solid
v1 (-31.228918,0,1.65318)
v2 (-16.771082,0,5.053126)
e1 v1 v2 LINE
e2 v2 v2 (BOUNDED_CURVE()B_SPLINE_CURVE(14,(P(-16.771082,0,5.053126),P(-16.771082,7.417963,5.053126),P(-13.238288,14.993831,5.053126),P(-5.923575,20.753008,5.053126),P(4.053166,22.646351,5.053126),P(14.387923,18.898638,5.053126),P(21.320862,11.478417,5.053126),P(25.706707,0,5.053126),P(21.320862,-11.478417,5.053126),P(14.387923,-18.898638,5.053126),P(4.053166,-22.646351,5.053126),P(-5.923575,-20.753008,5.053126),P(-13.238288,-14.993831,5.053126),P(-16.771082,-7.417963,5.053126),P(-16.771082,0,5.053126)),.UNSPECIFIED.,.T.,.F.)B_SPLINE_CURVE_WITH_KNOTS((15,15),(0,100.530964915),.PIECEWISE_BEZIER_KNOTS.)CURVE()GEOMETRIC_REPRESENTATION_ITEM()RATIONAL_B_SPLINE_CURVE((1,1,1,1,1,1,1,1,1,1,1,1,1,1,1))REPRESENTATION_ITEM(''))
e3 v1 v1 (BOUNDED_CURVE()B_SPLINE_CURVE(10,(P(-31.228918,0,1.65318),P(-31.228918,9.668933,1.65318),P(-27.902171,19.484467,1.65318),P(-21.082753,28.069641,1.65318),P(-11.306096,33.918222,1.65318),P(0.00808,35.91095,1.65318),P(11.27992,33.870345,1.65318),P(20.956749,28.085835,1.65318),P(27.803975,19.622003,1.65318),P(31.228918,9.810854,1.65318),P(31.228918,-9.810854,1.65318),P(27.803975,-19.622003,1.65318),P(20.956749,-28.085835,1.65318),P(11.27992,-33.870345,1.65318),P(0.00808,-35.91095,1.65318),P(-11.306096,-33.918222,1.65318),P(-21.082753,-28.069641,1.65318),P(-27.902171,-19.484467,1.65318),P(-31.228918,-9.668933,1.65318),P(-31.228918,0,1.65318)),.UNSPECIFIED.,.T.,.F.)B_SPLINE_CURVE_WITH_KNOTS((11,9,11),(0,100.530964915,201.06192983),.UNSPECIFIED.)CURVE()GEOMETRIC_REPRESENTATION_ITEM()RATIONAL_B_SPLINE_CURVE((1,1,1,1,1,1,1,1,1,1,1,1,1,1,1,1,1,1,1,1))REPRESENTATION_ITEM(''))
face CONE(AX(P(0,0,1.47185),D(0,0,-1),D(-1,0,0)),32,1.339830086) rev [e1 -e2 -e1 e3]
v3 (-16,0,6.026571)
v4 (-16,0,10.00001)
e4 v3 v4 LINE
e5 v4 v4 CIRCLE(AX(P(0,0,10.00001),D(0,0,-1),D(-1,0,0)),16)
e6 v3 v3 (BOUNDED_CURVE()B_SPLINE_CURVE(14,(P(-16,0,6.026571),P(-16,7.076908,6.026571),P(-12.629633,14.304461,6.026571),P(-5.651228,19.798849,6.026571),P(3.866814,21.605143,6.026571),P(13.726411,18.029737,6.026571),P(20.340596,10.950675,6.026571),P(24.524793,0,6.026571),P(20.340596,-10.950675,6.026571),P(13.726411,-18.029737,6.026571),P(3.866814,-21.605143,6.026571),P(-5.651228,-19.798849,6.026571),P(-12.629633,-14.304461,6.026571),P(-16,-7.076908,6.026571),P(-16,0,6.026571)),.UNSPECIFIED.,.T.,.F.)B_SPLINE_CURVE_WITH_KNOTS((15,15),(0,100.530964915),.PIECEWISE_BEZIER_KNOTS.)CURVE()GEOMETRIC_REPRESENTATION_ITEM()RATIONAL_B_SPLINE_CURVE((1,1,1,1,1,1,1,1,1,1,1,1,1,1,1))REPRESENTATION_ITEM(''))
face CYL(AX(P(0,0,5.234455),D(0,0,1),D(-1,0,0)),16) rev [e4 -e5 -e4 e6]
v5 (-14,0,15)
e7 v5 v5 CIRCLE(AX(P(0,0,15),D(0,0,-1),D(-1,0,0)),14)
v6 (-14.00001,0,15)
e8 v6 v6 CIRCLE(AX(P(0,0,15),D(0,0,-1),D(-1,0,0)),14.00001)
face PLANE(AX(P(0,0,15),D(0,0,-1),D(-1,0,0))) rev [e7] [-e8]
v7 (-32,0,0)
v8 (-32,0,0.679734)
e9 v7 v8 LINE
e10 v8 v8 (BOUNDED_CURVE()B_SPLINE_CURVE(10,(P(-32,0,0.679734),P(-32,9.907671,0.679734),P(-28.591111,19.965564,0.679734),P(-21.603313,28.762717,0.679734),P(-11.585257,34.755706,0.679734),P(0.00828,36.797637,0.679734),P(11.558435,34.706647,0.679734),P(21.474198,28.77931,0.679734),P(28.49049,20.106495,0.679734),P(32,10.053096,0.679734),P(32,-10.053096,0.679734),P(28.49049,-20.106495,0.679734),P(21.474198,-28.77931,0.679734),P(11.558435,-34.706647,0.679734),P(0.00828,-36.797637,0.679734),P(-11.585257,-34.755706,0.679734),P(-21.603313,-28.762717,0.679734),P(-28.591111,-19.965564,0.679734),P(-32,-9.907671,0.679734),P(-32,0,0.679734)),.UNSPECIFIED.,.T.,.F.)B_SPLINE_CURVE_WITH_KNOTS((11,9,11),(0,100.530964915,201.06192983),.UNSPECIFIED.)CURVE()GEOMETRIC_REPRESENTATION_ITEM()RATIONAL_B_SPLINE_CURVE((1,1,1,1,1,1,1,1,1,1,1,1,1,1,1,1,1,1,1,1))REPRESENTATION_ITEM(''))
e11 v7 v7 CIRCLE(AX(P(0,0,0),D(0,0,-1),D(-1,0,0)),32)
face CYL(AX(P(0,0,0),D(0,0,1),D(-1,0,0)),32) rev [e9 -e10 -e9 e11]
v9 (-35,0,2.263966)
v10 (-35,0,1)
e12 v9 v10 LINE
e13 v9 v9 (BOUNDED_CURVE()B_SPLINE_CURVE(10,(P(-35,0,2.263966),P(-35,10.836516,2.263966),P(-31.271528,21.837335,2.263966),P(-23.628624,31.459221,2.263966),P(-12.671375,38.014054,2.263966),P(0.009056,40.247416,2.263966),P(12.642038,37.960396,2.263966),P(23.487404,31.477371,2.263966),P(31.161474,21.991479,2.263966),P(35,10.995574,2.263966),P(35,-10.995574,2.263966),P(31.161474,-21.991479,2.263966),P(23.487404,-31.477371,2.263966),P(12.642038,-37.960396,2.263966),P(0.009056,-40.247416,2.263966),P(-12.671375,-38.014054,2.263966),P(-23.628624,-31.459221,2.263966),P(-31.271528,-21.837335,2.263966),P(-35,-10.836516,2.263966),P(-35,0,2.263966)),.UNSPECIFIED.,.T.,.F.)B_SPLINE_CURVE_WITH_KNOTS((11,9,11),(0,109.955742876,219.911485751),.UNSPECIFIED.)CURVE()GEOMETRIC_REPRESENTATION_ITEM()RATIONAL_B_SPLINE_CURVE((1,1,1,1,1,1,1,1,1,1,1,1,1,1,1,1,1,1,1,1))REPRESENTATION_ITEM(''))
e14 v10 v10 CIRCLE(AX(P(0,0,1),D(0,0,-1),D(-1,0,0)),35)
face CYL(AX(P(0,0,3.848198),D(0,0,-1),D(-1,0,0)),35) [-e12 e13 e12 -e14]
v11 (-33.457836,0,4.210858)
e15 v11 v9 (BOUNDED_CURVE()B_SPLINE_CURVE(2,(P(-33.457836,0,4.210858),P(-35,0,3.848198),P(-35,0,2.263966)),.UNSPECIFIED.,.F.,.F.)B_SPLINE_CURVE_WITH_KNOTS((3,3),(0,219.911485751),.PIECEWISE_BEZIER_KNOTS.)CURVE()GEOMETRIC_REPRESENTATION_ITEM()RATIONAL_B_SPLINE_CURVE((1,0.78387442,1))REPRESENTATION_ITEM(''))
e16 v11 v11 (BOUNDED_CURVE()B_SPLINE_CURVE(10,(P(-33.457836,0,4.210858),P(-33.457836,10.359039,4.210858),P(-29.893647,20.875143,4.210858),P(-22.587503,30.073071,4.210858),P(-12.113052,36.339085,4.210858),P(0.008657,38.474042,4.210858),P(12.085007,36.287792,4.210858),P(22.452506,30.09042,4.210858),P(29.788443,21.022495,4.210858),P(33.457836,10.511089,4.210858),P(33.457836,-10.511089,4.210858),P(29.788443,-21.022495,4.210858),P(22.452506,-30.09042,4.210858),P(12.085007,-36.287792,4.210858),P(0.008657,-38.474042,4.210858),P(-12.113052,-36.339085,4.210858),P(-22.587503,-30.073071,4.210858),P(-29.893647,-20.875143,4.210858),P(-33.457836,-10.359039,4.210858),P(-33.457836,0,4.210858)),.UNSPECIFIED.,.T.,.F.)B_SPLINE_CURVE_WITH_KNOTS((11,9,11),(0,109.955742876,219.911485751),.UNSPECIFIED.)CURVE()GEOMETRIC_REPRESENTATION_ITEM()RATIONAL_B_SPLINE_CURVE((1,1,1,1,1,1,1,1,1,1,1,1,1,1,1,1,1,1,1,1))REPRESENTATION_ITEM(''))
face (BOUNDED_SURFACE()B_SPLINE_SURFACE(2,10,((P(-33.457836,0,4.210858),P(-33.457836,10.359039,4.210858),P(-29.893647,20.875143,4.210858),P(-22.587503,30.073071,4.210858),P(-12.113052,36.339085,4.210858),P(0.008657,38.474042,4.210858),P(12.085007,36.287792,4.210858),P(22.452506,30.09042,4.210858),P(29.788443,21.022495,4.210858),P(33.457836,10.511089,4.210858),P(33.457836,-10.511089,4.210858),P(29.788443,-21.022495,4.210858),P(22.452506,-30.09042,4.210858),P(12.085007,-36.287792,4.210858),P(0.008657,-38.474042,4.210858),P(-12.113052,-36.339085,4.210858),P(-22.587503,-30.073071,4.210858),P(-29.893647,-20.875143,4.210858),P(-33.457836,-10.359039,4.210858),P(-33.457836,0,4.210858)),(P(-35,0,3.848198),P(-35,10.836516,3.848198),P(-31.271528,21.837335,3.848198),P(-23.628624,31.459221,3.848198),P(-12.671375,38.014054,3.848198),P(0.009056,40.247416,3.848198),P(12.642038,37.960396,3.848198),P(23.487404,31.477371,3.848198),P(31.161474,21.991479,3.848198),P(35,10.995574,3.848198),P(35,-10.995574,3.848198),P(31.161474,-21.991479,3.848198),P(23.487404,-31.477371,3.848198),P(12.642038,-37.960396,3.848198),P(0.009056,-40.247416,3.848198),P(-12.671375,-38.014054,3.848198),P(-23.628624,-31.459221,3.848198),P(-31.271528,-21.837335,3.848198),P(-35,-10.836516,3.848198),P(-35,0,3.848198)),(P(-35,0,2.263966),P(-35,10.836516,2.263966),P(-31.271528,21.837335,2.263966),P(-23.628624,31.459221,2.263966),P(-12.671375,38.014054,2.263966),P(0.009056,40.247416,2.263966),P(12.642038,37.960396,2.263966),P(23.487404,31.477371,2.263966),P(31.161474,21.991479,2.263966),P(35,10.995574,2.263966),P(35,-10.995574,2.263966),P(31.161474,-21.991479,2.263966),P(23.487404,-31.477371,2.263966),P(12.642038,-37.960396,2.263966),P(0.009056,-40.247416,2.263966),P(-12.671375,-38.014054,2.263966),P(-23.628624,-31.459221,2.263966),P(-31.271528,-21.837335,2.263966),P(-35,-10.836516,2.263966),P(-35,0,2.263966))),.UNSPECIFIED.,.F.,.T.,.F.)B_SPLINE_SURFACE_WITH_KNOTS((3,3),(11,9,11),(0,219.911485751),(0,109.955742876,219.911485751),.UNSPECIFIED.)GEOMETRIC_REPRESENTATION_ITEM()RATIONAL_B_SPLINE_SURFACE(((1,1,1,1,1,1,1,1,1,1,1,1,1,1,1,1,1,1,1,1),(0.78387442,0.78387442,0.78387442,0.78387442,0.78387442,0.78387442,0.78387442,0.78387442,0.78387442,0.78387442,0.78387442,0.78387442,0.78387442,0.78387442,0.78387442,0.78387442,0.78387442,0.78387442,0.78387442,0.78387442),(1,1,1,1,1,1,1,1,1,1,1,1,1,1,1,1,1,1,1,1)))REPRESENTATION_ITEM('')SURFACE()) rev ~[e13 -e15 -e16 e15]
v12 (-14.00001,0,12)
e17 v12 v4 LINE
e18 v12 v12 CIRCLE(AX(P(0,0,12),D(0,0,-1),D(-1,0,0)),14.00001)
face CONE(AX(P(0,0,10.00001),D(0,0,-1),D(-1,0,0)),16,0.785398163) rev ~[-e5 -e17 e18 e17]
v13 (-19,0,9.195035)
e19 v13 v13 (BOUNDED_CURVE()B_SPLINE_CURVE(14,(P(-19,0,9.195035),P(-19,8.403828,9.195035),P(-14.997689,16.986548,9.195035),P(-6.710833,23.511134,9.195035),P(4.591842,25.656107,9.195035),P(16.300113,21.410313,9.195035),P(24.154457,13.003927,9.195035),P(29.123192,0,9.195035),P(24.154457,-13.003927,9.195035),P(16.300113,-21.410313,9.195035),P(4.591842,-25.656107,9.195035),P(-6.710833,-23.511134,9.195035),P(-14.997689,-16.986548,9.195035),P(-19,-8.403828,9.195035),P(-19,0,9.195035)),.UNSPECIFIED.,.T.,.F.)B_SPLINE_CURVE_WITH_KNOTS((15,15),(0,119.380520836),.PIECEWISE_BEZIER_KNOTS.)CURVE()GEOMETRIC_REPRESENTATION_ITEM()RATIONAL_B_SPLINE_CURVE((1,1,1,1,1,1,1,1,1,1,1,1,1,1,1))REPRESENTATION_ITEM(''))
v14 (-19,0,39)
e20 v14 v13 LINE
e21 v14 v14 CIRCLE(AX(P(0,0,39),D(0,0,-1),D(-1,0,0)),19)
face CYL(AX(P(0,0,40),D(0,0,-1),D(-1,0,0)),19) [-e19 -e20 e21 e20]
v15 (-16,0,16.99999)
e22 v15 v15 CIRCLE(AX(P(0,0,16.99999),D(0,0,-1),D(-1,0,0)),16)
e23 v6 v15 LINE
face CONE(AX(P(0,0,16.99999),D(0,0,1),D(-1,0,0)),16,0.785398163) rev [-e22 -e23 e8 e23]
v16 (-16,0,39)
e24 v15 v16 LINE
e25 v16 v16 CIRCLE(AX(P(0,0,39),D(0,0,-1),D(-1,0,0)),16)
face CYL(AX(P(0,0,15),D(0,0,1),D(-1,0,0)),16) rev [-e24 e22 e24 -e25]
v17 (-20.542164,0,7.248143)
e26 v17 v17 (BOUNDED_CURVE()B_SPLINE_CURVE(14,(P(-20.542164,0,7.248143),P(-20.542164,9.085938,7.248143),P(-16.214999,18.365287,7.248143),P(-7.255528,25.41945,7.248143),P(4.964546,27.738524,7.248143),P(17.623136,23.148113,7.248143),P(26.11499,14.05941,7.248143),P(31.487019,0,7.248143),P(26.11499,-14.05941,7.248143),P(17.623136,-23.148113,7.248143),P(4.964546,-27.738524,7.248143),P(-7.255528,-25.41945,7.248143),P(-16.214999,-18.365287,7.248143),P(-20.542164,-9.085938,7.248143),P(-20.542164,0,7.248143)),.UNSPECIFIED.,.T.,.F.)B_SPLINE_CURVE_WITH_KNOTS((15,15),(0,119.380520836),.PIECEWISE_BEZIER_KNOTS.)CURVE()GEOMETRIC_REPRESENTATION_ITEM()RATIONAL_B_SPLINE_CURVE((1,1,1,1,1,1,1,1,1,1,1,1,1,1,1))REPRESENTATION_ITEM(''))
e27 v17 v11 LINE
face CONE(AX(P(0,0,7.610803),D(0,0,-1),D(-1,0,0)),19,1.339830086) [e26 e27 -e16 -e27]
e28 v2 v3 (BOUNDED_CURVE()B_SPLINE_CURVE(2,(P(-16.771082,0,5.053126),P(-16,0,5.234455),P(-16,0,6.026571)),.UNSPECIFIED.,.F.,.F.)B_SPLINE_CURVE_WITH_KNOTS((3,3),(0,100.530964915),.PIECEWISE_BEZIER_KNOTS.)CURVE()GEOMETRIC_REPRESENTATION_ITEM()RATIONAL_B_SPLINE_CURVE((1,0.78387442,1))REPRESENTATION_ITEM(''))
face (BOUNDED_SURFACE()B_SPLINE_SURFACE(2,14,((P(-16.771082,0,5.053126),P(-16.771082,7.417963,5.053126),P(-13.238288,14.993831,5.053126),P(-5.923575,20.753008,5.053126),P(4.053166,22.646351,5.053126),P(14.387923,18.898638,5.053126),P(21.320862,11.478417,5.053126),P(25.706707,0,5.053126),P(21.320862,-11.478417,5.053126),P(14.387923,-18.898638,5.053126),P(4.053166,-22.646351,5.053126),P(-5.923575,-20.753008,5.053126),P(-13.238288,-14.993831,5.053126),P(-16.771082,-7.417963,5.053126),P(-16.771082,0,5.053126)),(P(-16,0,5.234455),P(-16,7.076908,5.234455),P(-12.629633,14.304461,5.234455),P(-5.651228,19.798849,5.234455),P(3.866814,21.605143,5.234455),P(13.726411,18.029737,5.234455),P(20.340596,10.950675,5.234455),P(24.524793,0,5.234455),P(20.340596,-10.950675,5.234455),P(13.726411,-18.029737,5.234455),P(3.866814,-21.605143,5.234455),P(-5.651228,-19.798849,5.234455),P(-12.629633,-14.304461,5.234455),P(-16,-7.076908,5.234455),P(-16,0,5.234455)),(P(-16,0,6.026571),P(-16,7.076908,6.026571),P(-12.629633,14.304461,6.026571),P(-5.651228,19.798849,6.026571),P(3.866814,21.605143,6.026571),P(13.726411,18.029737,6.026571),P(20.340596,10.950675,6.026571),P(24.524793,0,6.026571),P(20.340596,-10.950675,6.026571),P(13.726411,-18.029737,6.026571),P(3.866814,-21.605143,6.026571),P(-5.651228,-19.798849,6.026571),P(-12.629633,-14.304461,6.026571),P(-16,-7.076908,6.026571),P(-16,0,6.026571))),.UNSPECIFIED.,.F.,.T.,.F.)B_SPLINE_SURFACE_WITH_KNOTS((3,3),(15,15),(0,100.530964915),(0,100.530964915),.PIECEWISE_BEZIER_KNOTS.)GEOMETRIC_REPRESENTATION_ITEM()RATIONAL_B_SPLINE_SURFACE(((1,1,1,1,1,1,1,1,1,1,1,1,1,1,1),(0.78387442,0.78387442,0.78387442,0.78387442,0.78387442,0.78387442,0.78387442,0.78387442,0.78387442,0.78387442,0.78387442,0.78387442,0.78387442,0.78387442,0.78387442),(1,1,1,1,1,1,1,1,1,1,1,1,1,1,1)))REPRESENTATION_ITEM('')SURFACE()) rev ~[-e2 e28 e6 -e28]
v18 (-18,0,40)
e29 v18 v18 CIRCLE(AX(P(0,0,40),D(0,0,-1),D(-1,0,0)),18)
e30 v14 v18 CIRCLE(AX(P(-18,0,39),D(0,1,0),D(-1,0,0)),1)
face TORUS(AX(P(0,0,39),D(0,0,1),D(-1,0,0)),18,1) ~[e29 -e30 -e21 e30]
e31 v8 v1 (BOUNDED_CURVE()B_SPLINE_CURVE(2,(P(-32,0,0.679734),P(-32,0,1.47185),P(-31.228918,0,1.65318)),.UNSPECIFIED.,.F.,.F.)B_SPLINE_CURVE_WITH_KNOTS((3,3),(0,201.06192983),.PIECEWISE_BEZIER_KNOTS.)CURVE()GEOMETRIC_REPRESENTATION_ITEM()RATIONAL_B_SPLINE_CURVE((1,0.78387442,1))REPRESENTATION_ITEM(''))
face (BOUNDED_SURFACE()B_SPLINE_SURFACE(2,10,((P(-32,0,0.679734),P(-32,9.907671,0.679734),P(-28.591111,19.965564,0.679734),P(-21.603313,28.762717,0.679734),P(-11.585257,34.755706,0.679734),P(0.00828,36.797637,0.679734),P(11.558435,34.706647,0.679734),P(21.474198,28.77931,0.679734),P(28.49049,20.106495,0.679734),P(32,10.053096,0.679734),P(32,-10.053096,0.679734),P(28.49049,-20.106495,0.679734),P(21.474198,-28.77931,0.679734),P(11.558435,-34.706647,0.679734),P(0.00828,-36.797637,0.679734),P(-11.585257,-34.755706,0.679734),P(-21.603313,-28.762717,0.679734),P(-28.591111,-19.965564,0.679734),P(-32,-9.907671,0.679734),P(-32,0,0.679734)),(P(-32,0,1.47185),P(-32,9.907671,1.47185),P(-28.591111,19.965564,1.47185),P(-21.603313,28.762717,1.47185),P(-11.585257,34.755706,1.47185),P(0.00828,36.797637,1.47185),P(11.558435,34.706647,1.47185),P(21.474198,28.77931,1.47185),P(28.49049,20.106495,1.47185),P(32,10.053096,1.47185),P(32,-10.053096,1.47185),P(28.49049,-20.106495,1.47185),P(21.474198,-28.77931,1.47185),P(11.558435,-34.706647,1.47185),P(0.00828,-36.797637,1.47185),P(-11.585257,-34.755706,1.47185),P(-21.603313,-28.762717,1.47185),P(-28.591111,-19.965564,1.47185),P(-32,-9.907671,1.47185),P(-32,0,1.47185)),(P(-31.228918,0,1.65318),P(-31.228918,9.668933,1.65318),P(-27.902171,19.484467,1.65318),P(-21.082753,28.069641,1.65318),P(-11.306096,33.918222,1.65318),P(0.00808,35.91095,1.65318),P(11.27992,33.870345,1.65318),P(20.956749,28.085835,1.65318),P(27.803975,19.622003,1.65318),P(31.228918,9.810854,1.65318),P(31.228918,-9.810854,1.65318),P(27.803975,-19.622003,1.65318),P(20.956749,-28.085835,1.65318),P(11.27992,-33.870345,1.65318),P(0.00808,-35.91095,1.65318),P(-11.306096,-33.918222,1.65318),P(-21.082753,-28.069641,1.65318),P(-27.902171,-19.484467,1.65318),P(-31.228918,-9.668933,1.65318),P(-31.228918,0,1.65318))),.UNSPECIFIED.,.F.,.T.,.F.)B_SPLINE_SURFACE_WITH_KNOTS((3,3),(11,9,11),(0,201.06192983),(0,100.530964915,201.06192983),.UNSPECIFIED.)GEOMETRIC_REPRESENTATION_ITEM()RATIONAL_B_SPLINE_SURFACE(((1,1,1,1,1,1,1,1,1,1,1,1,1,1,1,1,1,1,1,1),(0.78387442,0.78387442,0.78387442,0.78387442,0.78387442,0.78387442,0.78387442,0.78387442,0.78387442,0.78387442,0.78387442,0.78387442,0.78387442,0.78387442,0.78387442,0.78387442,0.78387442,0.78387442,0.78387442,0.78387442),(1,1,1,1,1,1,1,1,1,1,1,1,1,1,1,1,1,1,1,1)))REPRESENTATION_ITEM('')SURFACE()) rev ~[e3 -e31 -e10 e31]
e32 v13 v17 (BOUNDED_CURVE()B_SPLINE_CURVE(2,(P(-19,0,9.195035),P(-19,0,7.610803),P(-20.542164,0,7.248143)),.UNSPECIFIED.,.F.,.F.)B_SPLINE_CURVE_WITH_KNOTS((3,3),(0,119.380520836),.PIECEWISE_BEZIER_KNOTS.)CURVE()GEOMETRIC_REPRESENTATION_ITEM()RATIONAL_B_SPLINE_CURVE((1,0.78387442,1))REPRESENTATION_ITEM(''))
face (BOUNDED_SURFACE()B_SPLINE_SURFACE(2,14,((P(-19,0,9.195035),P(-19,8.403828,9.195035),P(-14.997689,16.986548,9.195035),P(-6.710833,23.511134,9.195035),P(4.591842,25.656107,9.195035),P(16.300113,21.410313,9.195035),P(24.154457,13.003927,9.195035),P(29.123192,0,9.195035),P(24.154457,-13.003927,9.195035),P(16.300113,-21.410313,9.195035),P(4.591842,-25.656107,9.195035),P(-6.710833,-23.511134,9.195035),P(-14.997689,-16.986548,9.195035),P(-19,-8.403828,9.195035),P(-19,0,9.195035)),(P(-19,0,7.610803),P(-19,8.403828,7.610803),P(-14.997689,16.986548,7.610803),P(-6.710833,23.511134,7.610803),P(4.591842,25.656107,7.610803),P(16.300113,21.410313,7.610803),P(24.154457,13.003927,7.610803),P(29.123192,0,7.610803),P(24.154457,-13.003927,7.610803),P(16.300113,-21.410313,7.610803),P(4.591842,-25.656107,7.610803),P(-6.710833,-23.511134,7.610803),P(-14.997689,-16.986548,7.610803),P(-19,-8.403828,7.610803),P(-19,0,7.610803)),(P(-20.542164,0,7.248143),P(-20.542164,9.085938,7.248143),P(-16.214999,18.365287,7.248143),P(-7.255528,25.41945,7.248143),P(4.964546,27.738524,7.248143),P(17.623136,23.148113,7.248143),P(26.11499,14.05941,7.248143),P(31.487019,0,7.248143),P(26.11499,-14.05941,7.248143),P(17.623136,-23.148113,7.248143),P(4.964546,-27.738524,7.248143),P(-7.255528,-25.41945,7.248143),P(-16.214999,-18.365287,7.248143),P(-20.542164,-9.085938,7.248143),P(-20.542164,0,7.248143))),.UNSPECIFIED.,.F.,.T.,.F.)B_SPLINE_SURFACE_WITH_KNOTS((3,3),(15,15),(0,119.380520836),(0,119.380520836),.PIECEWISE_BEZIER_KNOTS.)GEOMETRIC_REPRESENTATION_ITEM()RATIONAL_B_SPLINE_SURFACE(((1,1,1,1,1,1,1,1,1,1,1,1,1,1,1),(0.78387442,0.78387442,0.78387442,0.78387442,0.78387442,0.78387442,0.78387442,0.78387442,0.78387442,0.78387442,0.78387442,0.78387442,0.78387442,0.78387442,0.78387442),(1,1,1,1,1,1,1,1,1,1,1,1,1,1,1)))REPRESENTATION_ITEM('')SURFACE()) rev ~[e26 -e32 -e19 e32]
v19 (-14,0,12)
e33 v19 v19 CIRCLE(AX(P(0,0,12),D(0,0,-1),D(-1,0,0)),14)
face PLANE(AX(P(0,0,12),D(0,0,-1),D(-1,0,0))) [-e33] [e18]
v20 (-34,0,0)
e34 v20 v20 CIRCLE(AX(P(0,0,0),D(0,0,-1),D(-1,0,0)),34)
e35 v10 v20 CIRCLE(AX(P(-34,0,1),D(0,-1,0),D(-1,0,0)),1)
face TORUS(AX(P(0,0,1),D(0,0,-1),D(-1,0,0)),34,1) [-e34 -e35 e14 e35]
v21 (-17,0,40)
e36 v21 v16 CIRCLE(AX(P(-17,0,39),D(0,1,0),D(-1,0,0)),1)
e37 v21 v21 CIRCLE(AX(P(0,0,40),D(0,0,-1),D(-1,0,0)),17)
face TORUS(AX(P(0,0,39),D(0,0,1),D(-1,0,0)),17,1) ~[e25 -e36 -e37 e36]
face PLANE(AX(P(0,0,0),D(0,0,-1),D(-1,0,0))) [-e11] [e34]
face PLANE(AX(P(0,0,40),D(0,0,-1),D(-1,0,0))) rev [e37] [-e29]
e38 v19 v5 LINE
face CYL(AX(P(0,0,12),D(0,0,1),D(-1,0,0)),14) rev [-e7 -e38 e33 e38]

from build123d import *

# Parameters (mm, degrees)
F2_SIZE = 1.99999
F3_R    = 2
F4_R    = 1
F5_SIZE = 1.99999


# Not quite as in the source:
# - a fillet or chamfer is up to 0.001 mm smaller than in the source, because OpenCascade refuses the exact size


with BuildPart() as f1:
    # F0 (on Front) → F1 (revolve)
    with BuildSketch(Plane.XZ):
        Polygon((-35, 0), (-32, 0), (-32, 1.4718503955), (-16, 5.2344552971), (-16, 12), (-14, 12), (-14, 15), (-16, 15), (-16, 40), (-19, 40), (-19, 7.6108030044), (-35, 3.8481981028), align=None)
    revolve(axis=Axis((0, 0, 9.703790769), (0, 0, -1)))

    # F2 (size 2 in the source; OpenCascade refuses exactly that, so slightly less here)
    f2_edges = [f1.edges().sort_by_distance(p)[0] for p in [
        (16, 0, 15),
    ]]
    chamfer(f2_edges, length=F2_SIZE)

    # F3
    f3_edges = [f1.edges().sort_by_distance(p)[0] for p in [
        (35, 0, 3.848198),
        (19, 0, 7.610803),
    ]]
    fillet(f3_edges, radius=F3_R)

    # F4
    f4_edges = [f1.edges().sort_by_distance(p)[0] for p in [
        (32, 0, 1.47185),
        (16, 0, 5.234455),
        (35, 0, 0),
        (19, 0, 40),
        (16, 0, 40),
    ]]
    fillet(f4_edges, radius=F4_R)

    # F5 (size 2 in the source; OpenCascade refuses exactly that, so slightly less here)
    f5_edges = [f1.edges().sort_by_distance(p)[0] for p in [
        (16, 0, 12),
    ]]
    chamfer(f5_edges, length=F5_SIZE)


solid = f1.part
